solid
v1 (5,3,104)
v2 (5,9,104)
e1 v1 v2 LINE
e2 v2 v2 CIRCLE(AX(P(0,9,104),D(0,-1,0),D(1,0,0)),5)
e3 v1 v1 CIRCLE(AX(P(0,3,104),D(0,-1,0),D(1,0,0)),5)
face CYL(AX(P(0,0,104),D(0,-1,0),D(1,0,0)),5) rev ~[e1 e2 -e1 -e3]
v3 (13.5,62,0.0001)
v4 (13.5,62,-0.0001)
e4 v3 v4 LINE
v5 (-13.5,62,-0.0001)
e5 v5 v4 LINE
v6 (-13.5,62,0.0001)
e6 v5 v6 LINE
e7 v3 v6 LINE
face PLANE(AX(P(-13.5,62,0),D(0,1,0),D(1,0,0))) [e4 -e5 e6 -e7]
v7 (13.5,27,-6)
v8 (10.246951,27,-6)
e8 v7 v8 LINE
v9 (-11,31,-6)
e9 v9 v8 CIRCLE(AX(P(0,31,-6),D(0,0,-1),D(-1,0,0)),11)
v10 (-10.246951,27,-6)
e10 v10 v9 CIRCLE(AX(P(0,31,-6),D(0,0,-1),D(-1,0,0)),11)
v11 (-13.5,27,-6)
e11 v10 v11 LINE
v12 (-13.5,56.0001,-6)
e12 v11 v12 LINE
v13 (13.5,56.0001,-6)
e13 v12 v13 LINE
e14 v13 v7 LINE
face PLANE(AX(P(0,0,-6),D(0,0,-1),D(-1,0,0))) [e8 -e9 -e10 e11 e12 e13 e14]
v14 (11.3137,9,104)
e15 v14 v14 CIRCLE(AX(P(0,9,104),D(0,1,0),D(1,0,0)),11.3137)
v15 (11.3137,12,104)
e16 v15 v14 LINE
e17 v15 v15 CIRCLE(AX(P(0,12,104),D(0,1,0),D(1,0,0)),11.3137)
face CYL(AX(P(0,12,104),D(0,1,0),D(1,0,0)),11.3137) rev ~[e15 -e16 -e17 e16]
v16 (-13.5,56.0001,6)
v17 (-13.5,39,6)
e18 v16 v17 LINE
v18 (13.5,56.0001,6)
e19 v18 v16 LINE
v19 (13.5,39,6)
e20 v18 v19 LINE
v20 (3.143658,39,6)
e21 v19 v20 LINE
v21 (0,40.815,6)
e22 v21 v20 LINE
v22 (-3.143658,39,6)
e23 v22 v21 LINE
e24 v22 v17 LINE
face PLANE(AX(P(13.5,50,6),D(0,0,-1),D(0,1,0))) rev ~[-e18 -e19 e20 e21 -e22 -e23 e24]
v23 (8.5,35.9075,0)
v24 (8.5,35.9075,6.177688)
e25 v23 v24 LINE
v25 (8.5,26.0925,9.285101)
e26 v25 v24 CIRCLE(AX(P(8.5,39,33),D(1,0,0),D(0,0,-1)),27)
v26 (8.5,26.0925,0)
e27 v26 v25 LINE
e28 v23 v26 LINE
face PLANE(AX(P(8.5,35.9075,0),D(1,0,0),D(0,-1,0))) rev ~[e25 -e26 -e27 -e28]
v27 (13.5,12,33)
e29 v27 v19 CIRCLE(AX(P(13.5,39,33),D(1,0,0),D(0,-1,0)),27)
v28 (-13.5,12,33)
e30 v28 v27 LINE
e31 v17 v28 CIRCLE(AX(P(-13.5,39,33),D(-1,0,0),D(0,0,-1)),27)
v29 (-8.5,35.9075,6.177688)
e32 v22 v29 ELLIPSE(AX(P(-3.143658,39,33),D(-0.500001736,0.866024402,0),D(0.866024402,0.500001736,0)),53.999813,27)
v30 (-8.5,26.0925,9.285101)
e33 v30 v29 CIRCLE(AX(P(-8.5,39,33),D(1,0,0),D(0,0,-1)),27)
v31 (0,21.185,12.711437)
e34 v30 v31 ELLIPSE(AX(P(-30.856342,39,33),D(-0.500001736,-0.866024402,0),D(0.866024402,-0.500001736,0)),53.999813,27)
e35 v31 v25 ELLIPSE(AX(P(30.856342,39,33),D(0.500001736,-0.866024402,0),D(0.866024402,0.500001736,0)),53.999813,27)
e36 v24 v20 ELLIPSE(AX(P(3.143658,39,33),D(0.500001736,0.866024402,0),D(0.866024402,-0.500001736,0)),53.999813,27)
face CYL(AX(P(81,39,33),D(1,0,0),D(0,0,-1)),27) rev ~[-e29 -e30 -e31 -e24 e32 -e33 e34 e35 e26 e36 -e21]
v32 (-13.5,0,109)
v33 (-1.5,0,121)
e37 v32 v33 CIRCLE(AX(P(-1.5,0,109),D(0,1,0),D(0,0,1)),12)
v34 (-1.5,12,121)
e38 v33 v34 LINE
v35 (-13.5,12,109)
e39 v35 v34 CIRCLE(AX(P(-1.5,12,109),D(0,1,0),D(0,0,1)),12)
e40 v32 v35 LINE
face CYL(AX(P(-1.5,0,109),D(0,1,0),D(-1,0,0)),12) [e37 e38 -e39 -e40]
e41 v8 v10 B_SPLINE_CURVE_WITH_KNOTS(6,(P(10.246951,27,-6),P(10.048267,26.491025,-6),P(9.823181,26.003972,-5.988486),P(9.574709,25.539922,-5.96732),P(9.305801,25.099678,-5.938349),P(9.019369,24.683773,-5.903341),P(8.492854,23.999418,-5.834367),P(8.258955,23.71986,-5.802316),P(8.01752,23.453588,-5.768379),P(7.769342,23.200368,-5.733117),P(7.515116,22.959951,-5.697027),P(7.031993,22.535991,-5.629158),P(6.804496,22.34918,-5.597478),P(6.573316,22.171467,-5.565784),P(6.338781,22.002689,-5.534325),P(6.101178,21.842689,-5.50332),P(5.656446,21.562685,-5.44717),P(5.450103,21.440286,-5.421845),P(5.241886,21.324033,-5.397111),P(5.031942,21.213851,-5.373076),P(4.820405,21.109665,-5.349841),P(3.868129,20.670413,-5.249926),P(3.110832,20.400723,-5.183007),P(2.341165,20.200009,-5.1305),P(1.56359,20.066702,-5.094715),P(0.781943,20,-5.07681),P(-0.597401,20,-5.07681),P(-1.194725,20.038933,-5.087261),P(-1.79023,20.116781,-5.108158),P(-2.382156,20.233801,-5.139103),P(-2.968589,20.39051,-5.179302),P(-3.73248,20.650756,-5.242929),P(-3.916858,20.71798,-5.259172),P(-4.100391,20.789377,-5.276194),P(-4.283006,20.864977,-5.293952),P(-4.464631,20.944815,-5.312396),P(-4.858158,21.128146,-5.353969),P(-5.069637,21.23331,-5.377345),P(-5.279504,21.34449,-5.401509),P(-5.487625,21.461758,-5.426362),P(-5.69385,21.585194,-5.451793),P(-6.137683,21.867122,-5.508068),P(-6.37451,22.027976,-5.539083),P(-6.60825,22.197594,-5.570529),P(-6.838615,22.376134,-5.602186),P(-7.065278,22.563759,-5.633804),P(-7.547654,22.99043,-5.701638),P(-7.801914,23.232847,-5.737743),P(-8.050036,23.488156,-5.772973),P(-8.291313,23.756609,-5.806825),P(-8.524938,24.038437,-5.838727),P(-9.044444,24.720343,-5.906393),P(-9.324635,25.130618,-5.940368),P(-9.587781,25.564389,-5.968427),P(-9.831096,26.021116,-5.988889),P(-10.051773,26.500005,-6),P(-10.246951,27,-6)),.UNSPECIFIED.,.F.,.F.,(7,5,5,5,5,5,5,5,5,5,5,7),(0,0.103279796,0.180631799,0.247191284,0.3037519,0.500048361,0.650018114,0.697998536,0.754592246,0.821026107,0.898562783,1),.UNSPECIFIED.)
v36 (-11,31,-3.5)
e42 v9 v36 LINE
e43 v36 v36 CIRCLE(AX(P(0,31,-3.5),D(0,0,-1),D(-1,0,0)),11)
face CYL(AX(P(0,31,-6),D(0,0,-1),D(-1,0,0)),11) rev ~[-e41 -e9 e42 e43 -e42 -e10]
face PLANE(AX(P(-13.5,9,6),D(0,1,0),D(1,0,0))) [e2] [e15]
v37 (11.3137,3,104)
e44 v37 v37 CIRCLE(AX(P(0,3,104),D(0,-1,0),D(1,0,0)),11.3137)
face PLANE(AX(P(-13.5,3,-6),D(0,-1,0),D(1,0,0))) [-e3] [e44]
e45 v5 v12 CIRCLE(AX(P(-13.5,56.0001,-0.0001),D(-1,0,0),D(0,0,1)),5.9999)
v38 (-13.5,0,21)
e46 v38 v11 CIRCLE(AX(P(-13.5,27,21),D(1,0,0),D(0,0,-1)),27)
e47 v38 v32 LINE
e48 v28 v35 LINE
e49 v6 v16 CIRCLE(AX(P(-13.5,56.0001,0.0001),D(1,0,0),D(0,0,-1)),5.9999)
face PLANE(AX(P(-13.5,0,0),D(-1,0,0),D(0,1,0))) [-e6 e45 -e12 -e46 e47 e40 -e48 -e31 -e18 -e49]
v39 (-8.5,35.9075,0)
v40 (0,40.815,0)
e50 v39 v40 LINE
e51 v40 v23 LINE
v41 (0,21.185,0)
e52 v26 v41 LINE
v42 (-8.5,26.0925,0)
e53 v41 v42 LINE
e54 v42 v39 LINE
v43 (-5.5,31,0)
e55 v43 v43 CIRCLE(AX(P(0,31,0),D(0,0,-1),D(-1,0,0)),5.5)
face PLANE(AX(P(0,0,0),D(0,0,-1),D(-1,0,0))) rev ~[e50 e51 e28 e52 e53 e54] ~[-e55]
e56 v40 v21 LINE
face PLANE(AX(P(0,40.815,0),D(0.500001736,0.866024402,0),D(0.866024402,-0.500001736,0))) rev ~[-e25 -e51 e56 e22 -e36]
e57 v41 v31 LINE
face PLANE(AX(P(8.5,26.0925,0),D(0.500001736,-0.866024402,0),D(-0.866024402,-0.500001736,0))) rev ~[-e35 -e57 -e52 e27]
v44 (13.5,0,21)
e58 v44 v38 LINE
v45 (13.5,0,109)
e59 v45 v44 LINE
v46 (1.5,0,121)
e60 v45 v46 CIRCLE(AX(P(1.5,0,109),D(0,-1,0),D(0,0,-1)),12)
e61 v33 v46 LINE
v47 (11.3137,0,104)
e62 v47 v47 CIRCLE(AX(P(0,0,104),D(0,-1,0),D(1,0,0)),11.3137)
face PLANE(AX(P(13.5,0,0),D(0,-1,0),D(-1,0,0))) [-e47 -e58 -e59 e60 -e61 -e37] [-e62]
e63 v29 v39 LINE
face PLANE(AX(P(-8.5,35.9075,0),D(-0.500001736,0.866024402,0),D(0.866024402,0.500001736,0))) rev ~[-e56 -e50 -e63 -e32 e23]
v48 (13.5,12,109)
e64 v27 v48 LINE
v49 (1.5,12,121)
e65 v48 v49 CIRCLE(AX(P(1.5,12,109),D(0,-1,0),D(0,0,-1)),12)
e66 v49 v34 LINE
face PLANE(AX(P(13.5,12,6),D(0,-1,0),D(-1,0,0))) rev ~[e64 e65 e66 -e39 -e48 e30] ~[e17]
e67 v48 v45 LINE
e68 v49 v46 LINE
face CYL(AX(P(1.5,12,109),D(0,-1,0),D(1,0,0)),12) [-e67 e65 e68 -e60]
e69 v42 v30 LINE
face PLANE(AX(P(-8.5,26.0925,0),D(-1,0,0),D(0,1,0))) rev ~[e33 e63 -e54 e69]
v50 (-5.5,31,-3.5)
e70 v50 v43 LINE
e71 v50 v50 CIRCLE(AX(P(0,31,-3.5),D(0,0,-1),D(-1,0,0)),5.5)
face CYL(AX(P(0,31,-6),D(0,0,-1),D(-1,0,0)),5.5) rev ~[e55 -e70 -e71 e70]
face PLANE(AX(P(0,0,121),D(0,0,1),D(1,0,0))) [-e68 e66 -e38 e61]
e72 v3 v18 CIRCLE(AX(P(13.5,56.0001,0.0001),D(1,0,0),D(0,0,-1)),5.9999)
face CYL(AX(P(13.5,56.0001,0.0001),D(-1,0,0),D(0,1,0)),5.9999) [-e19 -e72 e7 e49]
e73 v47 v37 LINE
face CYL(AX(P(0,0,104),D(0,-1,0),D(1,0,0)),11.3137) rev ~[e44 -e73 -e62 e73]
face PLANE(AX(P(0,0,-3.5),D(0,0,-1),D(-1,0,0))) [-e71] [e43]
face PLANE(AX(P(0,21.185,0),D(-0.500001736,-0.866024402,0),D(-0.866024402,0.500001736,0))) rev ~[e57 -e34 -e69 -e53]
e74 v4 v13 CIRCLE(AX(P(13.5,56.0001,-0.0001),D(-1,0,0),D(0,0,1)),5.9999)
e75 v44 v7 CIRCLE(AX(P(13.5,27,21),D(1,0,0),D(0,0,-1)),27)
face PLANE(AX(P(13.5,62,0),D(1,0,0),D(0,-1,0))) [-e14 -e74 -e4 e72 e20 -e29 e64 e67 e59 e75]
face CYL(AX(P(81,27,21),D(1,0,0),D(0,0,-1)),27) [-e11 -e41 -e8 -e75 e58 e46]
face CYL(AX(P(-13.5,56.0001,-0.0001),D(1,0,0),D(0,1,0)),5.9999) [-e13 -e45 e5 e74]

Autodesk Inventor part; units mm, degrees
ref_plane "YZ Plane" through (0, 0, 0) normal (1, 0, 0) x (0, 1, 0)
ref_plane "XZ Plane" through (0, 0, 0) normal (0, 1, 0) x (-1, 0, 0)
ref_plane "XY Plane" through (0, 0, 0) normal (0, 0, 1) x (1, 0, 0)
sketch "Boceto1" plane through (0, 0, 0) normal (0, 0, 1) x (1, 0, 0)
  line L0 (-13.5, 62) -> (13.5, 62)
  line L1 (13.5, 62) -> (13.5, 0)
  line L2 (13.5, 0) -> (-13.5, 0)
  line L3 (-13.5, 0) -> (-13.5, 62)
  line L4 (0, 0) -> (0, 62) construction
  line L5 (0, 40.815) -> (8.5, 35.9075)
  line L6 (8.5, 35.9075) -> (8.5, 26.0925)
  line L7 (8.5, 26.0925) -> (0, 21.185)
  line L8 (0, 21.185) -> (-8.5, 26.0925)
  line L9 (-8.5, 26.0925) -> (-8.5, 35.9075)
  line L10 (-8.5, 35.9075) -> (0, 40.815)
  line L11 (-8.5, 35.9075) -> (-13.5, 35.9075) construction
  line L12 (8.5, 35.9075) -> (13.5, 35.9075) construction
  point P0 (0, 31)
  dimension "d20" = 17
  dimension "d21" = 5
  dimension "d22" = 27
  dimension "d23" = 62
extrude "Extrusión1" add sketch "Boceto1" along normal blind 6
sketch "Boceto2" plane through (0, 0, 0) normal (0, 0, -1) x (-1, 0, 0)
  line L0 (-8.5, 26.0925) -> (-8.5, 35.9075) projected
  line L1 (-8.5, 35.9075) -> (0, 40.815) projected
  line L2 (0, 40.815) -> (8.5, 35.9075) projected
  line L3 (8.5, 35.9075) -> (8.5, 26.0925) projected
  line L4 (8.5, 26.0925) -> (0, 21.185) projected
  line L5 (0, 21.185) -> (-8.5, 26.0925) projected
  line L6 (13.5, 62) -> (-13.5, 62) projected
  line L7 (-13.5, 62) -> (-13.5, 0) projected
  line L8 (-13.5, 0) -> (13.5, 0) projected
  line L9 (13.5, 0) -> (13.5, 62) projected
  point P0 (0, 0)
extrude "Extrusión2" add sketch "Boceto2" along normal blind 6 contours L0 L1 L2 L3 L4 L5 | L9 L8 L7 L6
sketch "Boceto3" plane through (0, 0, -6) normal (0, 0, -1) x (-1, 0, 0)
  line L0 (0, 0) -> (0, 62) construction
  line L1 (-13.5, 62) -> (13.5, 62) projected
  circle A0 centre (0, 31) radius 5.5
  dimension "d18" = 11
extrude "Extrusión3" cut sketch "Boceto3" against normal up to next
sketch "Boceto5" plane through (0, 0, 6) normal (0, 0, 1) x (1, 0, 0)
  line L0 (-13.5, 0) -> (-13.5, 62) projected
  line L1 (13.5, 62) -> (13.5, 0) projected
  line L2 (-13.5, 0) -> (13.5, 0)
  line L3 (13.5, 0) -> (13.5, 12)
  line L4 (13.5, 12) -> (-13.5, 12)
  line L5 (-13.5, 12) -> (-13.5, 0)
  line L6 (13.5, 62) -> (-13.5, 62) projected
  line L7 (-13.5, 62) -> (13.5, 62)
  line L8 (13.5, 62) -> (13.5, 50)
  line L9 (13.5, 50) -> (-13.5, 50)
  line L10 (-13.5, 50) -> (-13.5, 62)
  line L11 (-17.3027, 31) -> (12.0796, 31) construction
  line L12 (-8.5, 26.0925) -> (-8.5, 35.9075) projected
  point P0 (0, 0)
  point P1 (-8.5, 31)
  dimension "d24" = 12
extrude "Extrusión4" add sketch "Boceto5" along normal blind 115 contours L0 L4 L1 L2 | L0 L6 L1 L9
sketch "Boceto9" plane through (-13.5, 0, -6) normal (0, -1, 0) x (1, 0, 0)
  circle A0 centre (13.5, 110) radius 5
  line L0 (0, 127) -> (27, 127) projected
  line L1 (13.5, 110) -> (13.5, 115)
  line L2 (13.5, 115) -> (13.5, 127)
  line L3 (0, 127) -> (27, 127) projected
  point P0 (13.5, 6)
  dimension "d25" = 10
  dimension "d32" = 12
extrude "Extrusión8" cut sketch "Boceto9" against normal up to surface (12 mm away)
sketch "Boceto10" plane through (0, 0, -6) normal (0, 0, -1) x (-1, 0, 0)
  circle A0 centre (0, 31) radius 11
  circle A1 centre (0, 31) radius 5.5 projected
  point P0 (0, 0)
  dimension "d29" = 22
extrude "Extrusión9" cut sketch "Boceto10" against normal blind 2.5
sketch "Boceto11" plane through (-13.5, 12, 6) normal (0, 1, 0) x (1, 0, 0)
  line L0 (21.5, -106) -> (5.5, -106) construction
  line L1 (5.5, -106) -> (5.5, -90) construction
  line L2 (5.5, -90) -> (21.5, -90) construction
  line L3 (21.5, -90) -> (21.5, -106) construction
  line L4 (5.5, -106) -> (21.5, -90) construction
  circle A0 centre (13.5, -98) radius 8 construction
  circle A1 centre (13.5, -98) radius 11.3137
  line L5 (27, 0) -> (27, -115) projected
  circle A2 centre (13.5, -98) radius 5 projected
  point P0 (13.5, 6)
  dimension "d45" = 16
extrude "Extrusión10" cut sketch "Boceto11" against normal blind 3 contours A1 | A2
sketch "Boceto12" plane through (-13.5, 0, -6) normal (0, -1, 0) x (1, 0, 0)
  circle A0 centre (13.5, 110) radius 11.3137 projected
  line L0 (0, 127) -> (0, 0) projected
  point P0 (13.5, 6)
extrude "Extrusión11" cut sketch "Boceto12" against normal blind 3
sketch "Boceto14" plane through (-13.5, 62, -6) normal (0, 1, 0) x (1, 0, 0)
  circle A0 centre (13.5, -110) radius 5 projected
  circle A1 centre (13.5, -110) radius 5
  point P0 (13.5, -6)
  dimension "d38" = 10
extrude "Extrusión12" cut sketch "Boceto14" against normal up to next
sketch "Boceto15" plane through (-13.5, 50, 6) normal (0, -1, 0) x (1, 0, 0)
  circle A0 centre (13.5, 98) radius 5 projected
  circle A1 centre (13.5, 98) radius 12
  point P0 (13.5, -6)
  dimension "d41" = 24
extrude "Extrusión13" cut sketch "Boceto15" against normal blind 8
fillet "Empalme4" radius 12 4 edges at (13.5, 56, 121) (-13.5, 56, 121) (13.5, 6, 121) (-13.5, 6, 121)
sketch "Boceto17" plane through (13.5, 12, 6) normal (1, 0, 0) x (0, 0, -1)
  line L0 (-103, 38) -> (-115, 38) projected
  line L1 (-103, 50) -> (12, 50) projected
  line L2 (-115, 38) -> (0, 38)
  line L3 (0, 38) -> (0, 50)
  line L4 (0, 50) -> (-115, 50)
  line L5 (-115, 50) -> (-115, 38)
  point P0 (6, -12)
extrude "Extrusión14" cut sketch "Boceto17" against normal up to next
fillet "Empalme7" radius 6 2 edges at (0, 62, -6) (0, 62, 6)
fillet "Empalme8" radius 27 1 edges at (0, 12, 6)
fillet "Empalme9" radius 27 1 edges at (0, 0, -6)
properties part number "U2"
